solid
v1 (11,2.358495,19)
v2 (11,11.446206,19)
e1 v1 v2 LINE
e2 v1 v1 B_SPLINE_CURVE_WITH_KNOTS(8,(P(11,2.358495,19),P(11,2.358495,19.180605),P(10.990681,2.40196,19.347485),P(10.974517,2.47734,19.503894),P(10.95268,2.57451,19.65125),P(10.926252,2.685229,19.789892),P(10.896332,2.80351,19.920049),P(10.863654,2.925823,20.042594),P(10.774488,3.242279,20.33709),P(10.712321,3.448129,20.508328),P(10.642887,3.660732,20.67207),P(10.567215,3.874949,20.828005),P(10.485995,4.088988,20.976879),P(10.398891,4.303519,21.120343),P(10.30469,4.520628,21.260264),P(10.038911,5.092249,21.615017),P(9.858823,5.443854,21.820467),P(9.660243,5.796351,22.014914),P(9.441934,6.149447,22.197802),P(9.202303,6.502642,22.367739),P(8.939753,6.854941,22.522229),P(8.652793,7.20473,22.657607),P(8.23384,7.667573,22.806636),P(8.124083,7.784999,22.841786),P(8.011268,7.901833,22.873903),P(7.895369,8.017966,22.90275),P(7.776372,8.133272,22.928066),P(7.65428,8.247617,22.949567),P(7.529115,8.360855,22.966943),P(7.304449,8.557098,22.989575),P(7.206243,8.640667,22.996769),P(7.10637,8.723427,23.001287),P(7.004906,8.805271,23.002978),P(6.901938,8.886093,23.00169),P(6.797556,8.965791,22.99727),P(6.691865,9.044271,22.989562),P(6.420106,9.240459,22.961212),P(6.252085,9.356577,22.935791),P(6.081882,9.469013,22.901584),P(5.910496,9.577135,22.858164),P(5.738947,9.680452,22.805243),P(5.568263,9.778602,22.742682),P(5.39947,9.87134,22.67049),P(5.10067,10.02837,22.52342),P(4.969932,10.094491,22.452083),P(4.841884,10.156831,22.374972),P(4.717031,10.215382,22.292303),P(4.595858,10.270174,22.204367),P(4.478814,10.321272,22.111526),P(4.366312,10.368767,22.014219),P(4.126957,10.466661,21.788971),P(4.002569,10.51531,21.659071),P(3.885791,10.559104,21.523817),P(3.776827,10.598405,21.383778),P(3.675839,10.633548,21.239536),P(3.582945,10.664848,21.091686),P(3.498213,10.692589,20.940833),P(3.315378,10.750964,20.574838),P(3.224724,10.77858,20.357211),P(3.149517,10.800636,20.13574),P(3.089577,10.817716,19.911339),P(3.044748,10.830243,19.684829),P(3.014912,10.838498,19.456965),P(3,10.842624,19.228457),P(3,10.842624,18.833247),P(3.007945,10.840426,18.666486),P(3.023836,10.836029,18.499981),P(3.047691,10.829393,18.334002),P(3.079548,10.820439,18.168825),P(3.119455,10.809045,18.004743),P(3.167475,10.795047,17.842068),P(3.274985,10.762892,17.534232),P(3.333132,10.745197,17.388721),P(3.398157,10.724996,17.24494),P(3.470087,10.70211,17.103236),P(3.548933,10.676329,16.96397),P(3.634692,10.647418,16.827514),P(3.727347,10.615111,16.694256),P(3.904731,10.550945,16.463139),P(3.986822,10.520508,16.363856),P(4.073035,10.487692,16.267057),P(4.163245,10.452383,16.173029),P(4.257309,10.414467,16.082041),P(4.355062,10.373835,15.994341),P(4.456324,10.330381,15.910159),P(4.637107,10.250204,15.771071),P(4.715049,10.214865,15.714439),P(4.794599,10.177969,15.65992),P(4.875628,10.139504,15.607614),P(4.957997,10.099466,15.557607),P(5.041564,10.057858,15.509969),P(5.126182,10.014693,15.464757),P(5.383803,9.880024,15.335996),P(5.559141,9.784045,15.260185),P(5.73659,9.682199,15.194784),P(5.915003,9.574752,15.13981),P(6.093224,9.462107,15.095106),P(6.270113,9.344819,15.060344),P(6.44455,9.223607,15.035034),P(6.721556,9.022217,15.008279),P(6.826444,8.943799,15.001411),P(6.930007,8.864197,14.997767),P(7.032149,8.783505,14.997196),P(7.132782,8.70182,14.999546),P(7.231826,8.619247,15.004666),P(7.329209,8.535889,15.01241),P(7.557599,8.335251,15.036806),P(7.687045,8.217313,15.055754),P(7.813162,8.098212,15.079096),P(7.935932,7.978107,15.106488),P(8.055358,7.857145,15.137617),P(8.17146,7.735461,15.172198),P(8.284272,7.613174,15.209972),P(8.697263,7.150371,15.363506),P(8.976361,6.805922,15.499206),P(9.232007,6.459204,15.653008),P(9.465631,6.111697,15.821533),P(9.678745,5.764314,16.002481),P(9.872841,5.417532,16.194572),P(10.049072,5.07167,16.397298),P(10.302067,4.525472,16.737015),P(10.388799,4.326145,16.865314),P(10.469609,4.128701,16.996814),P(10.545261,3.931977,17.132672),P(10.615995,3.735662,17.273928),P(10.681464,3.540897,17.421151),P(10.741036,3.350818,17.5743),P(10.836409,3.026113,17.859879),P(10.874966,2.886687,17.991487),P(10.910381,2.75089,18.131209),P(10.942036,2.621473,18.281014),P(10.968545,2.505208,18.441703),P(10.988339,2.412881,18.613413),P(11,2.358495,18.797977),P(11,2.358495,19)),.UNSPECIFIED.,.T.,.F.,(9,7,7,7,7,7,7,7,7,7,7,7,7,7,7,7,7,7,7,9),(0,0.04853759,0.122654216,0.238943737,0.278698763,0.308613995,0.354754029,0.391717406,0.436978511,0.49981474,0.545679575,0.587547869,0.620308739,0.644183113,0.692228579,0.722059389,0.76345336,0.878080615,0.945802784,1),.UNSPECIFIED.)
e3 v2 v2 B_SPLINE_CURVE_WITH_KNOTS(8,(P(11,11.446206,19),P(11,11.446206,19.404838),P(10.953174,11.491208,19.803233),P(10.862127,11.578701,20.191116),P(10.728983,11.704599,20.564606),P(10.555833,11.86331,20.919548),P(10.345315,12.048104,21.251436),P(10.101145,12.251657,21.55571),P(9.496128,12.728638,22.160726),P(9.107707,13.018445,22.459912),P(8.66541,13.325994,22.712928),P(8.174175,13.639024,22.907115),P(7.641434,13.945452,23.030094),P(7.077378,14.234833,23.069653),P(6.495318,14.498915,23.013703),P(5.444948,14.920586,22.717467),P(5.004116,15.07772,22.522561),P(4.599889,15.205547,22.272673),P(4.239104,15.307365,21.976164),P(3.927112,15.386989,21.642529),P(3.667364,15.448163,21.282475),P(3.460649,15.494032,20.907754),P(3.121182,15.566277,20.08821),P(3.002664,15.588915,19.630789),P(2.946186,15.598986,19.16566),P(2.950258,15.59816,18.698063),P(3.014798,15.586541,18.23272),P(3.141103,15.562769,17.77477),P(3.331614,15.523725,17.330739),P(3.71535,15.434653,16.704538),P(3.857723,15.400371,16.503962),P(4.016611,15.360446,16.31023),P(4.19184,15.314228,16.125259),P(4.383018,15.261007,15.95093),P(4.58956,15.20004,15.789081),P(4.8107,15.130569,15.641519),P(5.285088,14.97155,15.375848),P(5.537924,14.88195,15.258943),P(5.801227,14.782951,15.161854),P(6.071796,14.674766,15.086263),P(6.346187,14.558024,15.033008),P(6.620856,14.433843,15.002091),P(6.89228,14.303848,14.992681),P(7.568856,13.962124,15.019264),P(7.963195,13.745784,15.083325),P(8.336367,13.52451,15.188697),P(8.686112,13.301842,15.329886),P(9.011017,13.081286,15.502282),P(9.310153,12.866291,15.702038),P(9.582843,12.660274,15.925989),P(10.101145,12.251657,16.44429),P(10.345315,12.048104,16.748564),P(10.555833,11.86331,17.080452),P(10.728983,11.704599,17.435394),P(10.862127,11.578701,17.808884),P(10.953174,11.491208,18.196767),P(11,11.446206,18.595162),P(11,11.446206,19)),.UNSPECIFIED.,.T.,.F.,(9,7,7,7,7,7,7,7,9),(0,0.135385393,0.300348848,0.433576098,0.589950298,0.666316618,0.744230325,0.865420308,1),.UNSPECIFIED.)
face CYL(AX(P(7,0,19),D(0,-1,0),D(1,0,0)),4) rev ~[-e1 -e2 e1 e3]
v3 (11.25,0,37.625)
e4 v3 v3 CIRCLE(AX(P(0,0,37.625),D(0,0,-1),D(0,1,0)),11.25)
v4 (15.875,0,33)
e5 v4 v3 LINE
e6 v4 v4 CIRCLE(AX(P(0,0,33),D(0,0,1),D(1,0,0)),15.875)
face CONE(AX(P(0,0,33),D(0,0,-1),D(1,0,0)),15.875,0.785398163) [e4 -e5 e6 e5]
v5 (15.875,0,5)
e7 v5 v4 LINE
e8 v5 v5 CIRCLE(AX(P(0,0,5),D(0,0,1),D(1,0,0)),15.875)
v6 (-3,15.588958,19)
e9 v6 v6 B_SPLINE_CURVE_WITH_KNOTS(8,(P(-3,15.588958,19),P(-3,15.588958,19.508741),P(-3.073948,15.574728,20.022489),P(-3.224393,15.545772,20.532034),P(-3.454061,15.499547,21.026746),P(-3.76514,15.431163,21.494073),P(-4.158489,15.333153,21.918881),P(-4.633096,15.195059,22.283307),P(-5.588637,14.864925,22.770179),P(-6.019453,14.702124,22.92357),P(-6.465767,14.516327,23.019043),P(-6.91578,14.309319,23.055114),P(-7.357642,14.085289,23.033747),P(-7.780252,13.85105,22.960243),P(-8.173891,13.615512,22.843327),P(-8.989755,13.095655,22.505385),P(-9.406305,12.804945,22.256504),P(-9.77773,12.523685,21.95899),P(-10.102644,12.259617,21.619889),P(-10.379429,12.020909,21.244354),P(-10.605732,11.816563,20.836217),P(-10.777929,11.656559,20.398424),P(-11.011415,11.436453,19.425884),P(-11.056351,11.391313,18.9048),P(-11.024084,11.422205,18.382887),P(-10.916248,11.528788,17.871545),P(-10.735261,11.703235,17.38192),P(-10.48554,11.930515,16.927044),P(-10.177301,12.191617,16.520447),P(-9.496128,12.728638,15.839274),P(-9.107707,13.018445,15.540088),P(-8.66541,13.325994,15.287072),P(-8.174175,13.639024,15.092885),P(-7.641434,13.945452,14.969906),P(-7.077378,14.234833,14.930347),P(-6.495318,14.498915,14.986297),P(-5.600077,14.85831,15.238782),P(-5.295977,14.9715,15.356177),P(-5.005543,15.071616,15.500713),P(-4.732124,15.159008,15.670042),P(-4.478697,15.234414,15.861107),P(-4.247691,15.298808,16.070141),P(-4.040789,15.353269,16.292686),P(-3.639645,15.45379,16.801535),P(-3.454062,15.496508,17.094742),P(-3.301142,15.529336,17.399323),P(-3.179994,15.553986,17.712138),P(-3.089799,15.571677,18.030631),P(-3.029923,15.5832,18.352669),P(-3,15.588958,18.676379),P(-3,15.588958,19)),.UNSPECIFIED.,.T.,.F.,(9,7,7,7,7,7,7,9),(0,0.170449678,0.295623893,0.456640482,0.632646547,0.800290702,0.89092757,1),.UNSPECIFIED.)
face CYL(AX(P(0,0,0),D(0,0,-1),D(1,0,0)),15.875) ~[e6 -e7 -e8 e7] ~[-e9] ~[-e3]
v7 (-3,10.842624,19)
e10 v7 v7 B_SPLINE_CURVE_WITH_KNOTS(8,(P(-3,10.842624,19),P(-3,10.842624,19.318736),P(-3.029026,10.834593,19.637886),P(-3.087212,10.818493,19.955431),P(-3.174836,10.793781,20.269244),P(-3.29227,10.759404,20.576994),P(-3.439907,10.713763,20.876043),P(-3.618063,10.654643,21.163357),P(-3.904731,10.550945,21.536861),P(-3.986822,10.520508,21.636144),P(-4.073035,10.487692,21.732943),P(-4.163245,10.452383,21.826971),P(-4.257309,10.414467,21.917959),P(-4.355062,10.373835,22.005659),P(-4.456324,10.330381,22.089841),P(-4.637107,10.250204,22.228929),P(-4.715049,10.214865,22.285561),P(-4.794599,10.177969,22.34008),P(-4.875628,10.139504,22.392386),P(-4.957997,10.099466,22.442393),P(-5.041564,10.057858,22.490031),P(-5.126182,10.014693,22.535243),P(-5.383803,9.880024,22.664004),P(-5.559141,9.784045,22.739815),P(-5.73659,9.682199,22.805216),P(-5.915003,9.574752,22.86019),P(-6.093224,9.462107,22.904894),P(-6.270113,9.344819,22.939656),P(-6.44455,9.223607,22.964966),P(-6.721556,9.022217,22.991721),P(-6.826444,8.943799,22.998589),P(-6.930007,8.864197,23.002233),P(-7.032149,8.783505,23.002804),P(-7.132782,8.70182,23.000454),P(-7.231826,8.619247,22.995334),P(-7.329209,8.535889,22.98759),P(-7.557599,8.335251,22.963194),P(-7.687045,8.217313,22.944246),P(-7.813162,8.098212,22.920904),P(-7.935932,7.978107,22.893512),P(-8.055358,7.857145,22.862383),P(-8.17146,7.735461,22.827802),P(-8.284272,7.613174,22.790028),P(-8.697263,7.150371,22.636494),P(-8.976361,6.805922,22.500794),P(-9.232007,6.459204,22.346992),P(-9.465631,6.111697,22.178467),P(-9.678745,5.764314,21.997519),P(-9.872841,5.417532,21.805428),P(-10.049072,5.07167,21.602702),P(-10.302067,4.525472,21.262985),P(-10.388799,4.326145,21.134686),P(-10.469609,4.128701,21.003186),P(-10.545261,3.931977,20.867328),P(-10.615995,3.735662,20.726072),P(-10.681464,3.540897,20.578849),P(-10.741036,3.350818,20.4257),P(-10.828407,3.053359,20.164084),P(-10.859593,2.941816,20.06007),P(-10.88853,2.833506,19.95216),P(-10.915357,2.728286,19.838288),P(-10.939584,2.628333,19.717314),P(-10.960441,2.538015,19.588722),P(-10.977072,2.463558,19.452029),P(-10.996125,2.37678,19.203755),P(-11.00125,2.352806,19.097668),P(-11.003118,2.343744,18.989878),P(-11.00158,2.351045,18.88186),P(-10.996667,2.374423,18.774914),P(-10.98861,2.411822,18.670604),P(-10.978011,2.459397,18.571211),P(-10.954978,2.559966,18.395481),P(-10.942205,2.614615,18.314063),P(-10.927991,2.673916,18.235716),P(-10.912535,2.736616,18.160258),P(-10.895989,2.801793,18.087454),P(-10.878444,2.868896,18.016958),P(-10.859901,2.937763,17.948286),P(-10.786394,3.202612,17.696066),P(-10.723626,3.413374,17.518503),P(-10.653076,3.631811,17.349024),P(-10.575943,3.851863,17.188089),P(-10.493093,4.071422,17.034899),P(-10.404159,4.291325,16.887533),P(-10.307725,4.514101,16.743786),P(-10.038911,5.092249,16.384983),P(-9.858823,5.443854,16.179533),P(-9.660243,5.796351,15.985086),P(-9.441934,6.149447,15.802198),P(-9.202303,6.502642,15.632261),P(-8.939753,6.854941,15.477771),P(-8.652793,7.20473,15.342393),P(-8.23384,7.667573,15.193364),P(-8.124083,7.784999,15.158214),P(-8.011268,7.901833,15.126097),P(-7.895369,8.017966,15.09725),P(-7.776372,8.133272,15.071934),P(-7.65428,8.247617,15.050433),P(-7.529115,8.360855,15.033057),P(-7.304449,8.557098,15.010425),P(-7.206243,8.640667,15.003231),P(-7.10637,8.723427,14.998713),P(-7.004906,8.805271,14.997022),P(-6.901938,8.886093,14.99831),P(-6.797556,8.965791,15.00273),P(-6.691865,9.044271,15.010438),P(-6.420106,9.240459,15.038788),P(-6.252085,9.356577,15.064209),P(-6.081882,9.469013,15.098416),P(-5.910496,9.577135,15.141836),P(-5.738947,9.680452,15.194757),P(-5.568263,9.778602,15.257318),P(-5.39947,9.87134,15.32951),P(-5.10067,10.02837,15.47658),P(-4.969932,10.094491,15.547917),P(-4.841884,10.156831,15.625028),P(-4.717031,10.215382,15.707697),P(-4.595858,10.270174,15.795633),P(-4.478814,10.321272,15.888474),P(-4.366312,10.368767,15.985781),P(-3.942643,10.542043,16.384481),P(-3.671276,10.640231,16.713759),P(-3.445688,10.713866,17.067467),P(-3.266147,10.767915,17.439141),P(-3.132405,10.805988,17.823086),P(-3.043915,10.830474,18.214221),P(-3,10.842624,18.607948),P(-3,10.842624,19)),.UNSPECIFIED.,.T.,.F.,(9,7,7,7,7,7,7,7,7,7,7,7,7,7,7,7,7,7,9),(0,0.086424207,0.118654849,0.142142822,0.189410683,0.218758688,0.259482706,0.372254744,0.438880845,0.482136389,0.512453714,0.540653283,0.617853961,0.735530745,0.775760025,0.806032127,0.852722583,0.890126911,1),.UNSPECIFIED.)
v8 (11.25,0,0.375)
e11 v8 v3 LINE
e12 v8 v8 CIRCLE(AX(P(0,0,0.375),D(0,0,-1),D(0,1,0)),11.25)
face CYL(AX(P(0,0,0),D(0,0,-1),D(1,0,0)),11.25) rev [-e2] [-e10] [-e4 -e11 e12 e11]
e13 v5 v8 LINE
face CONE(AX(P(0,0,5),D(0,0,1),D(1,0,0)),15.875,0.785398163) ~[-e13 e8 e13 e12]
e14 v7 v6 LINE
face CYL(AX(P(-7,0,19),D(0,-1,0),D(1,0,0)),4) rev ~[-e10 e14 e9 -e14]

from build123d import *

# Parameters (mm, degrees)
F0_R     = 15.875
F0_R_2   = 11.25
F1_DEPTH = 38
F2_R     = 4
F4_DEPTH = 15.876


# Not quite as in the source:
# - a fillet or chamfer that OpenCascade refuses, or shapes differently, is made with other operations: its cross-section is extruded or revolved along the edge and cut away or added


with BuildPart() as f1:
    # F0 (on Top) → F1 (new body)
    with BuildSketch(Plane.XY):
        Circle(F0_R)
        Circle(F0_R_2, mode=Mode.SUBTRACT)
    extrude(amount=F1_DEPTH)

    # F3: chamfer of 5 on 2 edges, made by hand

    # F3_s1 → F3_t2 (revolve, cut)
    with BuildSketch(Plane.XZ):
        Polygon((15.875, 33), (10.875, 38), (15.875, 38), align=None)
    revolve(axis=Axis((0, 0, 38), (0, 0, 1)), mode=Mode.SUBTRACT)

    # F3_s3 → F3_t4 (revolve, cut)
    with BuildSketch(Plane.XZ):
        Polygon((15.875, 5), (10.875, 0), (15.875, 0), align=None)
    revolve(axis=Axis((0, 0, 0), (0, 0, 1)), mode=Mode.SUBTRACT)

    # F2 (on Front) → F4 (cut, through all)
    with BuildSketch(Plane.XZ):
        with Locations((7, 19)):
            Circle(F2_R)
        with Locations((-7, 19)):
            Circle(F2_R)
    extrude(amount=-F4_DEPTH, mode=Mode.SUBTRACT)


solid = f1.part
